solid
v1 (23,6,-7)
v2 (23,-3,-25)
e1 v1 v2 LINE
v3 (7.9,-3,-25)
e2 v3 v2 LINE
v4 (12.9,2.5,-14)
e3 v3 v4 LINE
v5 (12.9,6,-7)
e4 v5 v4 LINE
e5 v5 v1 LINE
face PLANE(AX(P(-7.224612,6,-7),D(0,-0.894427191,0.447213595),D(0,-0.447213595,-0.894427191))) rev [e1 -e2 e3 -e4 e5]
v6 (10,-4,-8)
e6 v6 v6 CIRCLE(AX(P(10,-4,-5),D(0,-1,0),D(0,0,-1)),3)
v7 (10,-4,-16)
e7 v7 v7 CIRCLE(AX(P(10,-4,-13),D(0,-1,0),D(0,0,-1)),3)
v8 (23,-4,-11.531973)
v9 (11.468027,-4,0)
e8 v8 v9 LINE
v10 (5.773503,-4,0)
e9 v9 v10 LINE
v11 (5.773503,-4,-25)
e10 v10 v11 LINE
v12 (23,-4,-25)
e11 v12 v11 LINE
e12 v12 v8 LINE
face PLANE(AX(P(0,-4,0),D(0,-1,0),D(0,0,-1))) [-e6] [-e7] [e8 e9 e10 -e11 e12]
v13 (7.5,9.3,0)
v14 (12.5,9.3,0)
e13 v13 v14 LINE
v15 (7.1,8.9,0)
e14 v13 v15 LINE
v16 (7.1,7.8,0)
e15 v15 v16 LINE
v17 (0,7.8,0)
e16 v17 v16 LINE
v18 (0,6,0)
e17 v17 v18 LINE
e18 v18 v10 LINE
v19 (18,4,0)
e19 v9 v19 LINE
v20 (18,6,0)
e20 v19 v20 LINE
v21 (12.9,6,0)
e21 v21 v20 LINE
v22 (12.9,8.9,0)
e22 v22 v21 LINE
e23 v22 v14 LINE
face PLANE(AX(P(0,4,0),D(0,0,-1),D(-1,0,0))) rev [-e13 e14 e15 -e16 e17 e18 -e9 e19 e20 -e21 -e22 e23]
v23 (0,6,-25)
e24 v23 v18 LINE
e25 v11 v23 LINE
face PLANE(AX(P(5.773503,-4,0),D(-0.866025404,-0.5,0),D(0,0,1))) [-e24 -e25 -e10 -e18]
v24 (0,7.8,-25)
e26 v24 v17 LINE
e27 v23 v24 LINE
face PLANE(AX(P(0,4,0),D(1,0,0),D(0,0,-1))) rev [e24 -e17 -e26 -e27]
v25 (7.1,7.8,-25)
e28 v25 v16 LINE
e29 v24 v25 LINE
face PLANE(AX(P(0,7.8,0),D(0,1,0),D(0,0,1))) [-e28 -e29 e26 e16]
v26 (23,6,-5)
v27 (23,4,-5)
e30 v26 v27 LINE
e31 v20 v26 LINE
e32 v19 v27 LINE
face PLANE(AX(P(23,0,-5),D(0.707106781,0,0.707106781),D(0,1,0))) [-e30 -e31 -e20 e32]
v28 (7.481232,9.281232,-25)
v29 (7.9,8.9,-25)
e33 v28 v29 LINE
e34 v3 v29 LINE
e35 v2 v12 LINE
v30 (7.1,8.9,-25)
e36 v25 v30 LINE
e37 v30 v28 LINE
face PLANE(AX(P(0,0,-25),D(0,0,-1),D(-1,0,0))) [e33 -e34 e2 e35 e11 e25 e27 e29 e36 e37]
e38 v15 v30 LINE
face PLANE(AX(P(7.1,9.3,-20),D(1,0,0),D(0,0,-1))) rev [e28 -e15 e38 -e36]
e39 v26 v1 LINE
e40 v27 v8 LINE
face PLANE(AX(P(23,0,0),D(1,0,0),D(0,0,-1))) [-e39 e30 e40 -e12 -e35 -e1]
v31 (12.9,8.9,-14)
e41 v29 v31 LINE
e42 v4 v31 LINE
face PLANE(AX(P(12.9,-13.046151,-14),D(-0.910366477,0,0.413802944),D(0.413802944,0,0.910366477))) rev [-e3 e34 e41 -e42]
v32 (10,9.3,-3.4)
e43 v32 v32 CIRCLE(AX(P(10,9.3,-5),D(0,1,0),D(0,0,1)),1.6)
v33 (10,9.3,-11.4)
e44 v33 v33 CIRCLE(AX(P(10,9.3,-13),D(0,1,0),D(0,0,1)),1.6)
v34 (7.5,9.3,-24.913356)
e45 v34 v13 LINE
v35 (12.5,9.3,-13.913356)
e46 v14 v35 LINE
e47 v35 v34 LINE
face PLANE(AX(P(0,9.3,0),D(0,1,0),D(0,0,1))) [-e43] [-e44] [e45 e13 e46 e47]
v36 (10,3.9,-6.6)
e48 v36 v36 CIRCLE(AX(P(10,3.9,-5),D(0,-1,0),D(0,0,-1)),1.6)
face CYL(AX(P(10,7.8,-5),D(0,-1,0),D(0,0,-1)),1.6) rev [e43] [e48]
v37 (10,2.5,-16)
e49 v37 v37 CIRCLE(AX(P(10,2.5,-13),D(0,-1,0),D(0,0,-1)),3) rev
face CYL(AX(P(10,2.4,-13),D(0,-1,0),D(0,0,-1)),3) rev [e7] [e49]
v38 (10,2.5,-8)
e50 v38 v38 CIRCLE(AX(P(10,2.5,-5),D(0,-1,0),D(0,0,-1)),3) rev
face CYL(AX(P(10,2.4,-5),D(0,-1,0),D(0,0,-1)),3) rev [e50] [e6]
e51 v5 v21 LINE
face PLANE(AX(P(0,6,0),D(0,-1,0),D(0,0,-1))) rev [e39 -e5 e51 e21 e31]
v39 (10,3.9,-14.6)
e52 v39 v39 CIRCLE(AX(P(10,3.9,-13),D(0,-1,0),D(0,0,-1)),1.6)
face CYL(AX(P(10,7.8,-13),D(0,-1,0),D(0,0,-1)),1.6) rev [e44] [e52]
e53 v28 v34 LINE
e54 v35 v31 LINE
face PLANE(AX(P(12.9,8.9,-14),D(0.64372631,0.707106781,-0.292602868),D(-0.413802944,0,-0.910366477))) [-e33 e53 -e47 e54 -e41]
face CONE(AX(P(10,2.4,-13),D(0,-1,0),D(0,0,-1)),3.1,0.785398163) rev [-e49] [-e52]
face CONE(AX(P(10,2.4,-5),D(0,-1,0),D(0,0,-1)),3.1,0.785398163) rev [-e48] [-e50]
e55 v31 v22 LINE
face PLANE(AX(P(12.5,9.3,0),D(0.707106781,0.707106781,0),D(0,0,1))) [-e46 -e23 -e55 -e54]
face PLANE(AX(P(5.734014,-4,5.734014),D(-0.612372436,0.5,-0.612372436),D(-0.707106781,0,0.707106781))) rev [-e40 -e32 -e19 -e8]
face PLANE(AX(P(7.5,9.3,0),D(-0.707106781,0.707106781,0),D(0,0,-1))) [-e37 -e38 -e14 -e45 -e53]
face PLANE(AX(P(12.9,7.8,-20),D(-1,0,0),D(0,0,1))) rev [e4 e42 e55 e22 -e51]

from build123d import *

# Parameters (mm, degrees)
SKETCH_1_W           = 20
SKETCH_1_H           = 20
EXTRUDE_1_DEPTH      = 4
SKETCH_2_W           = 12.9
SKETCH_2_H           = 20
EXTRUDE_2_DEPTH      = 3.8
SKETCH_3_R           = 1.6
CUT_EXTRUDE_1_DEPTH  = 30.340074983
SKETCH_4_W           = 5.8
SKETCH_4_H           = 20
SKETCH_4_R           = 1.6
EXTRUDE_3_DEPTH      = 1.5
SKETCH_5_R           = 3
CUT_EXTRUDE_3_DEPTH  = 2.4
SKETCH_6_W           = 20
SKETCH_6_H           = 4
EXTRUDE_4_DEPTH      = 3
EXTRUDE_START        = 4
SKETCH_7_W           = 23
SKETCH_7_H           = 20
SKETCH_7_R           = 3
EXTRUDE_5_DEPTH      = 4
SKETCH_9_W           = 10.1
SKETCH_9_H           = 20
EXTRUDE_6_DEPTH      = 2
EXTRUDE_7_DEPTH      = 5
CHAMFER_7_SIZE       = 10
CHAMFER_7_SIZE2      = 5.773502692
CHAMFER_8_SIZE       = 5
CHAMFER_9_SIZE       = 8
CHAMFER_9_SIZE2      = 4.618802154
CUT_EXTRUDE_9_DEPTH  = 10.1
CUT_EXTRUDE_10_REACH = 38.481
CHAMFER_10_SIZE      = 1.5
CHAMFER_11_SIZE      = 0.4


with BuildPart() as part:
    # 草图1 → 凸台-拉伸1 (new body)
    with BuildSketch(Plane(origin=(0, 0, 0), x_dir=(1, 0, 0), z_dir=(0, 1, 0))):
        with Locations((10, 10)):
            Rectangle(SKETCH_1_W, SKETCH_1_H)
    extrude(amount=EXTRUDE_1_DEPTH)

    # 草图2 → 凸台-拉伸2 (add)
    with BuildSketch(Plane(origin=(0, 4, 0), x_dir=(1, 0, 0), z_dir=(0, 1, 0))):
        with Locations((6.45, 10)):
            Rectangle(SKETCH_2_W, SKETCH_2_H)
    extrude(amount=EXTRUDE_2_DEPTH)

    # 草图3 → 切除-拉伸1 (cut, through all)
    with BuildSketch(Plane(origin=(0, 0, 0), x_dir=(-1, 0, 0), z_dir=(0, -1, 0))):
        with Locations(Location((-10, 5, 0), (0, 0, 90))):
            Circle(SKETCH_3_R)
        with Locations(Location((-10, 13, 0), (0, 0, 90))):
            Circle(SKETCH_3_R)
    extrude(amount=-CUT_EXTRUDE_1_DEPTH, mode=Mode.SUBTRACT)

    # 草图4 → 凸台-拉伸3 (add)
    with BuildSketch(Plane(origin=(0, 7.8, 0), x_dir=(1, 0, 0), z_dir=(0, 1, 0))):
        with Locations((10, 10)):
            Rectangle(SKETCH_4_W, SKETCH_4_H)
        with Locations(Location((10, 13, 0), (0, 0, 90))):
            Circle(SKETCH_4_R, mode=Mode.SUBTRACT)
        with Locations(Location((10, 5, 0), (0, 0, 90))):
            Circle(SKETCH_4_R, mode=Mode.SUBTRACT)
    extrude(amount=EXTRUDE_3_DEPTH)

    # 草图5 → 切除-拉伸3 (cut)
    with BuildSketch(Plane(origin=(0, 0, 0), x_dir=(-1, 0, 0), z_dir=(0, -1, 0))):
        with Locations(Location((-10, 5, 0), (0, 0, 90))):
            Circle(SKETCH_5_R)
        with Locations(Location((-10, 13, 0), (0, 0, 90))):
            Circle(SKETCH_5_R)
    extrude(amount=-CUT_EXTRUDE_3_DEPTH, mode=Mode.SUBTRACT)

    # 草图6 → 凸台-拉伸4 (add)
    with BuildSketch(Plane(origin=(20, 0, 0), x_dir=(0, 0, -1), z_dir=(1, 0, 0))):
        with Locations((10, 2)):
            Rectangle(SKETCH_6_W, SKETCH_6_H)
    extrude(amount=EXTRUDE_4_DEPTH)

    # 草图7 → 凸台-拉伸5 (add)
    with BuildSketch(Plane(origin=(0, 0, 0), x_dir=(-1, 0, 0), z_dir=(0, -1, 0)).offset(EXTRUDE_START)):
        with Locations((-11.5, 10)):
            Rectangle(SKETCH_7_W, SKETCH_7_H)
        with Locations(Location((-10, 13, 0), (0, 0, 90))):
            Circle(SKETCH_7_R, mode=Mode.SUBTRACT)
        with Locations(Location((-10, 5, 0), (0, 0, 90))):
            Circle(SKETCH_7_R, mode=Mode.SUBTRACT)
    extrude(amount=-EXTRUDE_5_DEPTH)

    # 草图9 → 凸台-拉伸6 (add)
    with BuildSketch(Plane(origin=(0, 4, 0), x_dir=(1, 0, 0), z_dir=(0, 1, 0))):
        with Locations((17.95, 10)):
            Rectangle(SKETCH_9_W, SKETCH_9_H)
    extrude(amount=EXTRUDE_6_DEPTH)

    # 草图11 → 凸台-拉伸7 (add)
    with BuildSketch(Plane(origin=(0, 0, -20), x_dir=(-1, 0, 0), z_dir=(0, 0, -1))):
        Polygon((-23, 6), (-23, -4), (0, -4), (0, 7.8), (-7.1, 7.8), (-7.1, 9.3), (-12.9, 9.3), (-12.9, 6), align=None)
    extrude(amount=EXTRUDE_7_DEPTH)

    # 倒角7
    chamfer_7_edges = [part.edges().sort_by_distance(p)[0] for p in [
        (0, -4, -12.5),
    ]]
    chamfer_7_side = [part.faces().sort_by_distance(p)[0] for p in [
        (0, 1.9, -12.5),
    ]]
    chamfer(chamfer_7_edges, length=CHAMFER_7_SIZE, length2=CHAMFER_7_SIZE2, reference=chamfer_7_side[0])

    # 倒角8
    chamfer_8_edges = [part.edges().sort_by_distance(p)[0] for p in [
        (23, 1, 0),
    ]]
    chamfer(chamfer_8_edges, length=CHAMFER_8_SIZE)

    # 倒角9
    chamfer_9_edges = [part.edges().sort_by_distance(p)[0] for p in [
        (20.5, -4, -2.5),
    ]]
    chamfer_9_side = [part.faces().sort_by_distance(p)[0] for p in [
        (20.5, 1, -2.5),
    ]]
    chamfer(chamfer_9_edges, length=CHAMFER_9_SIZE, length2=CHAMFER_9_SIZE2, reference=chamfer_9_side[0])

    # 草图15 → 切除-拉伸9 (cut)
    with BuildSketch(Plane(origin=(23, 0, 0), x_dir=(0, 0, -1), z_dir=(1, 0, 0))):
        Polygon((25, -3), (25, 6), (7, 6), align=None)
    extrude(amount=-CUT_EXTRUDE_9_DEPTH, mode=Mode.SUBTRACT)

    # 切除-拉伸10: up to this plane
    cut_extrude_10_end = Plane(origin=(-7.224611797, 6, -7), z_dir=(0, -0.894427190999916, 0.447213595499958))
    # 草图16 → 切除-拉伸10 (cut, up to the surface)
    with BuildSketch(Plane(origin=(0, 9.3, 0), x_dir=(1, 0, 0), z_dir=(0, 1, 0)), mode=Mode.PRIVATE) as cut_extrude_10_sk1:
        Polygon((7.9, 25), (12.9, 25), (12.9, 14), align=None)
    cut_extrude_10_tool1 = split(extrude(cut_extrude_10_sk1.sketch, amount=-CUT_EXTRUDE_10_REACH, mode=Mode.PRIVATE), bisect_by=cut_extrude_10_end, keep=Keep.BOTH, mode=Mode.PRIVATE)
    add(cut_extrude_10_tool1.solids().sort_by_distance((11.233333, 9.3, -21.333333))[0], mode=Mode.SUBTRACT)

    # 倒角10
    # the kernel refuses this chamfer: 1.5 mm, written as the material it takes off along each edge
    with BuildSketch(Plane(origin=(10, 2.4, -13), x_dir=(0, 0, -1), z_dir=(-1, 0, 0))) as chamfer_10_piece_1_section:
        Polygon((1.6, -CHAMFER_10_SIZE), (1.6 + CHAMFER_10_SIZE, 0), (1.6, 0), align=None)
    chamfer_10_piece_1 = revolve(axis=Axis((10, 2.4, -13), (0, -1, 0)), mode=Mode.PRIVATE)
    chamfer_10_piece_1 = chamfer_10_piece_1 & Plane(origin=(10, 2.4, -13), x_dir=(0, 0, -1), z_dir=(0, -1, 0)) * Cylinder(3, 13, mode=Mode.PRIVATE)
    add(chamfer_10_piece_1, mode=Mode.SUBTRACT)
    with BuildSketch(Plane(origin=(10, 2.4, -5), x_dir=(0, 0, -1), z_dir=(-1, 0, 0))) as chamfer_10_piece_2_section:
        Polygon((1.6, -CHAMFER_10_SIZE), (1.6 + CHAMFER_10_SIZE, 0), (1.6, 0), align=None)
    chamfer_10_piece_2 = revolve(axis=Axis((10, 2.4, -5), (0, -1, 0)), mode=Mode.PRIVATE)
    chamfer_10_piece_2 = chamfer_10_piece_2 & Plane(origin=(10, 2.4, -5), x_dir=(0, 0, -1), z_dir=(0, -1, 0)) * Cylinder(3, 13, mode=Mode.PRIVATE)
    add(chamfer_10_piece_2, mode=Mode.SUBTRACT)

    # 倒角11
    # the kernel refuses this chamfer: 0.4 mm, written as the material it takes off along each edge
    with BuildSketch(Plane(origin=(13.325667997, 9.3, -13.063530407), x_dir=(-0.9103664774626047, 4.440892098500618e-15, 0.41380294430118414), z_dir=(-0.4138029443011842, 0, -0.9103664774626047))) as chamfer_11_piece_1:
        Polygon((CHAMFER_11_SIZE, 0), (0, -CHAMFER_11_SIZE), (0, 0), align=None)
    extrude(amount=14.140392364, mode=Mode.SUBTRACT)
    with BuildSketch(Plane(origin=(12.9, 9.3, 1.028673195), x_dir=(-1, 0, 0), z_dir=(0, 0, -1))) as chamfer_11_piece_2:
        Polygon((CHAMFER_11_SIZE, 0), (0, -CHAMFER_11_SIZE), (0, 0), align=None)
    extrude(amount=16.05734639, mode=Mode.SUBTRACT)
    with BuildSketch(Plane(origin=(7.1, 9.3, 1.028673195), x_dir=(1, 0, 0), z_dir=(0, 0, -1))) as chamfer_11_piece_3:
        Polygon((CHAMFER_11_SIZE, 0), (0, CHAMFER_11_SIZE), (0, 0), align=None)
    extrude(amount=27.05734639, mode=Mode.SUBTRACT)


solid = part.part
